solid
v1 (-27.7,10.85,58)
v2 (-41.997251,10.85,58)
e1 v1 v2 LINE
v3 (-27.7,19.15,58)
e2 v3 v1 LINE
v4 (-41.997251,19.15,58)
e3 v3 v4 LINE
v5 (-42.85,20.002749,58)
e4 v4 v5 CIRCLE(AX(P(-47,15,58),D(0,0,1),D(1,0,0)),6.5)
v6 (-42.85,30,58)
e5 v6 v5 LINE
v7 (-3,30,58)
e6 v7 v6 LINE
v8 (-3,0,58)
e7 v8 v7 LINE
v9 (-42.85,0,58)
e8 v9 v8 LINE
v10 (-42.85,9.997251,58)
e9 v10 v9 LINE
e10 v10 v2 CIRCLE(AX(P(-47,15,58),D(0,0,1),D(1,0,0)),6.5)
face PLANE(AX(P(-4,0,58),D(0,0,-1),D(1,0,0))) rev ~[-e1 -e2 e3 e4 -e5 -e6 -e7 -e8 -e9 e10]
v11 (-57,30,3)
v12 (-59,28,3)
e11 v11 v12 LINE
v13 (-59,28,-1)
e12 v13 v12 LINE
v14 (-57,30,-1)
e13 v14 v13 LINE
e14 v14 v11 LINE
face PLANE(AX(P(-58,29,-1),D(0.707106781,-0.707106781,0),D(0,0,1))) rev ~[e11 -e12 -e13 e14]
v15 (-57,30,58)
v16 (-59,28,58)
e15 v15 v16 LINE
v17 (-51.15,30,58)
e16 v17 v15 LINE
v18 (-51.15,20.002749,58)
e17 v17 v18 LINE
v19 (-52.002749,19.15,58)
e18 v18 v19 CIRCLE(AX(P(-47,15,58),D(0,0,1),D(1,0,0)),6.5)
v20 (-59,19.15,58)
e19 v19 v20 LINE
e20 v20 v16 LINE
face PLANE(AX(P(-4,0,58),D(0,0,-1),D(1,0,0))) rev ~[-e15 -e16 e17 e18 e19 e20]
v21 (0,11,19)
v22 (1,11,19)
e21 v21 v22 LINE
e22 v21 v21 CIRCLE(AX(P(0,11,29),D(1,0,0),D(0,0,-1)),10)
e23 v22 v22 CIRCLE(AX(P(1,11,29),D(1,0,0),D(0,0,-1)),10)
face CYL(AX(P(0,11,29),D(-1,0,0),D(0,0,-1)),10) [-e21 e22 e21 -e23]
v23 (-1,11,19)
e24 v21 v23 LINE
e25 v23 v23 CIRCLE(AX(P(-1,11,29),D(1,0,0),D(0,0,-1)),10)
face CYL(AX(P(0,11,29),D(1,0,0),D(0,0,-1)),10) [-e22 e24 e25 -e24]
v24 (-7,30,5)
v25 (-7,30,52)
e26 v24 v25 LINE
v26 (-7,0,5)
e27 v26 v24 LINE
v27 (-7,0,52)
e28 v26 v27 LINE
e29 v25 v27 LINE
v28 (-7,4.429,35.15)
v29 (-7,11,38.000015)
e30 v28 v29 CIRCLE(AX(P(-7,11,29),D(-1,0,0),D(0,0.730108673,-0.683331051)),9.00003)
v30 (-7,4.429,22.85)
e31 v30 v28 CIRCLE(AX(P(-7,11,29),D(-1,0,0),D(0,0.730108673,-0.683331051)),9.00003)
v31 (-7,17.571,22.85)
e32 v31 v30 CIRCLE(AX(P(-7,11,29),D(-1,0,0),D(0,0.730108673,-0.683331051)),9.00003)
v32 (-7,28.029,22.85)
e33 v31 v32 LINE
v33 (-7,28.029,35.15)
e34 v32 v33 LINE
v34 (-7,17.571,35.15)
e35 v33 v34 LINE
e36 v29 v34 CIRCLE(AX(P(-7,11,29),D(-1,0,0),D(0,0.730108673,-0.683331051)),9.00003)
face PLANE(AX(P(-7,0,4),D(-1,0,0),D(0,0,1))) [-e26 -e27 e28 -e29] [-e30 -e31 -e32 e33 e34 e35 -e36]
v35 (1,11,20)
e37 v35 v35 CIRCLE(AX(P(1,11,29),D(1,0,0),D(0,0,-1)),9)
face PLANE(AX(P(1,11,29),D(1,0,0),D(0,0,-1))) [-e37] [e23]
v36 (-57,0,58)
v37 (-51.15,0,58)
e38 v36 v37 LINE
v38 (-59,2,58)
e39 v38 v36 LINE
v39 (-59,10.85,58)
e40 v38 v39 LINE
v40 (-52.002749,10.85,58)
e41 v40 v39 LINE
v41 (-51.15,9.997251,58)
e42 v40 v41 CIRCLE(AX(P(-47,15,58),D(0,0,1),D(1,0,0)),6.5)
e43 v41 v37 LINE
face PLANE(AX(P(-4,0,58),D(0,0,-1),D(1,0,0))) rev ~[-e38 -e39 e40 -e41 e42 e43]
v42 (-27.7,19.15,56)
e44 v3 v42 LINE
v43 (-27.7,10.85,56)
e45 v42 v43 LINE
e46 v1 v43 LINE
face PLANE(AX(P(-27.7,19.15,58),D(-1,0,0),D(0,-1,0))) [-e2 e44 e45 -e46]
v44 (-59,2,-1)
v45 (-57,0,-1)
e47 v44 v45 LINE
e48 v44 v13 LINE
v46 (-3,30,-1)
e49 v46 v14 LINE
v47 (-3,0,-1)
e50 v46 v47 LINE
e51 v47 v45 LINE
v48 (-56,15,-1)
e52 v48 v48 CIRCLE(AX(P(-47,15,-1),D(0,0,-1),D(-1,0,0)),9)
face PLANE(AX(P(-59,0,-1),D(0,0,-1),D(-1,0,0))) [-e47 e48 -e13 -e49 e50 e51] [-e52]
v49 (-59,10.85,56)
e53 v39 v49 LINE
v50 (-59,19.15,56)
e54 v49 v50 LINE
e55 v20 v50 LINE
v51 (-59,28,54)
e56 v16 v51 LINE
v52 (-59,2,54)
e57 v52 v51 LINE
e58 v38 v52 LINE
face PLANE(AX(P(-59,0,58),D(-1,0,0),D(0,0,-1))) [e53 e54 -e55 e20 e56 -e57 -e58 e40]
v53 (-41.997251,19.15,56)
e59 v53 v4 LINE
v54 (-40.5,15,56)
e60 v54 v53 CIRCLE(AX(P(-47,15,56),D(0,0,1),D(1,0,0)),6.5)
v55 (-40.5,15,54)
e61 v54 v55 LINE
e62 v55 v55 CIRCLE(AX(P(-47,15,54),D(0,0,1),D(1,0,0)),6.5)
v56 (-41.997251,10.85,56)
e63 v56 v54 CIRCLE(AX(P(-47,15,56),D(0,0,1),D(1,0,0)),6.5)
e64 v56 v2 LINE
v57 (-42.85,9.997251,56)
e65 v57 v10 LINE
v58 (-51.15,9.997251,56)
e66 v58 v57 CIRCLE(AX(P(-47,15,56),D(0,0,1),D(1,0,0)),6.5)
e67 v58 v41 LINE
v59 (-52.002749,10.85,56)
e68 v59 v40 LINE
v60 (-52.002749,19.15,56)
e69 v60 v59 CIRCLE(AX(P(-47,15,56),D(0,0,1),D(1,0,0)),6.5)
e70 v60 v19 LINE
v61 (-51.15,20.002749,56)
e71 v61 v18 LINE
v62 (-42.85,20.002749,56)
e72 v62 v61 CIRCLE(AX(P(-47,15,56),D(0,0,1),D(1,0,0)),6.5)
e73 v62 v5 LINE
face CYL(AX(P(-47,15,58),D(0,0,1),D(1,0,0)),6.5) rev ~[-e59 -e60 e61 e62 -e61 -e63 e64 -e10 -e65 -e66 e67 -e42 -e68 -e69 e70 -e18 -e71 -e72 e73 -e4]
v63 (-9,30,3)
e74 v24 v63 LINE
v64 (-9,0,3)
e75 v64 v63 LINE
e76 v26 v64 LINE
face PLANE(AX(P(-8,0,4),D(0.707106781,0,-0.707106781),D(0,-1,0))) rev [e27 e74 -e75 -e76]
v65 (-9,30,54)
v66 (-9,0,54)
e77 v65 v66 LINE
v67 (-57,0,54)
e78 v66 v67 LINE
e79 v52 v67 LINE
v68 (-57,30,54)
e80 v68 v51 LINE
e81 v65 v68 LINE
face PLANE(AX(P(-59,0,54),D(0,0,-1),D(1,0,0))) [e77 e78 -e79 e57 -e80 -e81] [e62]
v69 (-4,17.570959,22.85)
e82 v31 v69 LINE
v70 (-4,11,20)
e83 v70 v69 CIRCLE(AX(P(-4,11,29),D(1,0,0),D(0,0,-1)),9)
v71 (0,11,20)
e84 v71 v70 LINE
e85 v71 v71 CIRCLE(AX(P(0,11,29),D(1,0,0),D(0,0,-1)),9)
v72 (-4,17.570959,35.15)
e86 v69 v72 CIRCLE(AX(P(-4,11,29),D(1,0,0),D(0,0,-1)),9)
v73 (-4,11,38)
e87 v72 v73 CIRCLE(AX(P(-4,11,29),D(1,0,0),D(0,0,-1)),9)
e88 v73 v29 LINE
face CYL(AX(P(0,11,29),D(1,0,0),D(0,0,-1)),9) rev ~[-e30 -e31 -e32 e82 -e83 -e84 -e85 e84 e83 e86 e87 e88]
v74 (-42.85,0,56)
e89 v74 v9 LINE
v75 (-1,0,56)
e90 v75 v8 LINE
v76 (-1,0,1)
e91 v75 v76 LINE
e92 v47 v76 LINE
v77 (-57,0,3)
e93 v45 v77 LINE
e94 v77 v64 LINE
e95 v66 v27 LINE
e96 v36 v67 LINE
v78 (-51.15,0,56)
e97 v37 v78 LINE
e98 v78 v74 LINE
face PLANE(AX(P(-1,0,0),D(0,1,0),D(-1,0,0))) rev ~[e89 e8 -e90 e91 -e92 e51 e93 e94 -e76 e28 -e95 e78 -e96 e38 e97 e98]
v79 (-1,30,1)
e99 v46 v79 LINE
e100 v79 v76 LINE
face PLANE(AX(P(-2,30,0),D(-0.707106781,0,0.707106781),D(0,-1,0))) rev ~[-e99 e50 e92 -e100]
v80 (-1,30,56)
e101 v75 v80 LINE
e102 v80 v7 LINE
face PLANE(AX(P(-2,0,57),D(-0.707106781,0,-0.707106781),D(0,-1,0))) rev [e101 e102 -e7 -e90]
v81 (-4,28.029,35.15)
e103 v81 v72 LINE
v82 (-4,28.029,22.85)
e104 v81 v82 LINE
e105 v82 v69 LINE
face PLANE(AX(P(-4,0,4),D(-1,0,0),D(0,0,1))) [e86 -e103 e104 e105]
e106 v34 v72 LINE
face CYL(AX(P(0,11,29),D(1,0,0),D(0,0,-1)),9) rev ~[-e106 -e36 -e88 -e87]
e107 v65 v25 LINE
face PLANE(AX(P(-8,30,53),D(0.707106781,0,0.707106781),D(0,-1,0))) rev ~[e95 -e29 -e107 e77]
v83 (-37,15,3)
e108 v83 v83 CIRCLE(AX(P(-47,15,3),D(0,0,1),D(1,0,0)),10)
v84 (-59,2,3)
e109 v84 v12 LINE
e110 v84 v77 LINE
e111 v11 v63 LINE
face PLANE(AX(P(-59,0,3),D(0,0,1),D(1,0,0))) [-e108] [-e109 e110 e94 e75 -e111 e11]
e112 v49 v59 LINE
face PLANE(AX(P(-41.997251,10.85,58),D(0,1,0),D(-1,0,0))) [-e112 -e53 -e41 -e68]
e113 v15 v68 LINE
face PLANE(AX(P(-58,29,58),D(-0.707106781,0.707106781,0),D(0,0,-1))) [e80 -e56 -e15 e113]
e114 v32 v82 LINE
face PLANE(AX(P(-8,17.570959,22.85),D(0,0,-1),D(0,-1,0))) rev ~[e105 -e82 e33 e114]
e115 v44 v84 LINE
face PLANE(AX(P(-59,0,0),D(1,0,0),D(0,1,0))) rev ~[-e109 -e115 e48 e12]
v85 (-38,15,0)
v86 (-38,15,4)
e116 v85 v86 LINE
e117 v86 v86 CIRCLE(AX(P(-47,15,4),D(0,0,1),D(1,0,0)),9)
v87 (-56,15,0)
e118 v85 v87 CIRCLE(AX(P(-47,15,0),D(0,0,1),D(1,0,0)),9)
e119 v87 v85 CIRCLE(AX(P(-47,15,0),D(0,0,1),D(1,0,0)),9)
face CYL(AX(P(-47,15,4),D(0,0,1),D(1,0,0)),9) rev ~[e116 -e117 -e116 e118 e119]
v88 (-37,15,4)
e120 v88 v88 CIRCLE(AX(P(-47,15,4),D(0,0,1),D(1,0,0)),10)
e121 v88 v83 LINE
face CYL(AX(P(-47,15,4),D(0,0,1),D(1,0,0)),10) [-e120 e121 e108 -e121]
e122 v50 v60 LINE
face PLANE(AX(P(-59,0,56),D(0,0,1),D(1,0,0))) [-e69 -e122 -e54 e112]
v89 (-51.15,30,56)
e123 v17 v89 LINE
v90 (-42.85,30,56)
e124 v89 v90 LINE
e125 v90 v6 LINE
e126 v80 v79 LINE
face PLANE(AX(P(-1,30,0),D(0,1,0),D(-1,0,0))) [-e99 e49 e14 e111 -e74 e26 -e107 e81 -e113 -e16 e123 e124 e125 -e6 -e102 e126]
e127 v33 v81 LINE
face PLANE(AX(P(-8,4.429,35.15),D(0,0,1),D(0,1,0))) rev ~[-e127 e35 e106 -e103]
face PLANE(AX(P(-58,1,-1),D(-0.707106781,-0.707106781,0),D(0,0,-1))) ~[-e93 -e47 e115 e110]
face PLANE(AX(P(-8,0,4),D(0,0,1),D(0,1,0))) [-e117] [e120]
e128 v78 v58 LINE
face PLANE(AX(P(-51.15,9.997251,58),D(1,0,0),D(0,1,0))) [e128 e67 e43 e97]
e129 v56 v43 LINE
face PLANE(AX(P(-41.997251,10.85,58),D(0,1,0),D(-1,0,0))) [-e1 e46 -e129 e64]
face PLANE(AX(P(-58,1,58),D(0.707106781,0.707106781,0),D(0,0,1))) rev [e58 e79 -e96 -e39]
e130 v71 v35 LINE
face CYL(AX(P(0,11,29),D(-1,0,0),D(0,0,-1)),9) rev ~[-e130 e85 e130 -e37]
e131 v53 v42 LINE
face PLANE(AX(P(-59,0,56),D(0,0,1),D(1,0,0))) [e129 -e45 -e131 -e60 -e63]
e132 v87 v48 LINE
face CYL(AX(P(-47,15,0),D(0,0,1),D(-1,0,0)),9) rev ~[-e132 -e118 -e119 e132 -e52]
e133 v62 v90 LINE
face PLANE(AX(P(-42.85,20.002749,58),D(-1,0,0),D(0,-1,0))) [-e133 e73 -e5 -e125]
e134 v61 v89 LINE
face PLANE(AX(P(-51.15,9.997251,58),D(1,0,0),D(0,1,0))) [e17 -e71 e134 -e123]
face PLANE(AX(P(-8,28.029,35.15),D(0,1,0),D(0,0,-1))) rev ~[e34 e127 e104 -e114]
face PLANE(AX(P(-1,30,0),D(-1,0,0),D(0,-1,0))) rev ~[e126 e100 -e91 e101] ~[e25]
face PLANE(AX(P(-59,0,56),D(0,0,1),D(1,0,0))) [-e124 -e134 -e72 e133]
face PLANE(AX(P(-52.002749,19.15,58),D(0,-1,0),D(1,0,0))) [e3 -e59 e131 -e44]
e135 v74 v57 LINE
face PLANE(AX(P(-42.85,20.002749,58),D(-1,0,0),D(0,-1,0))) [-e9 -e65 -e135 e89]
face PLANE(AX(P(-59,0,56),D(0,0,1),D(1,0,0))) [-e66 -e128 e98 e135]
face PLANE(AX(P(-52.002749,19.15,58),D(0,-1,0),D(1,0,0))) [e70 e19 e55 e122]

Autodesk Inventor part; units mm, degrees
ref_plane "YZ Plane" through (0, 0, 0) normal (1, 0, 0) x (0, 1, 0)
ref_plane "XZ Plane" through (0, 0, 0) normal (0, 1, 0) x (-1, 0, 0)
ref_plane "XY Plane" through (0, 0, 0) normal (0, 0, 1) x (1, 0, 0)
sketch "Boceto1" plane through (0, 0, 0) normal (0, 1, 0) x (-1, 0, 0)
  line L0 (0, 0) -> (4, 0)
  line L1 (4, 0) -> (4, 58)
  line L2 (4, 58) -> (0, 58)
  line L3 (0, 58) -> (0, 0)
  line L4 (4, 58) -> (59, 58)
  line L5 (59, 58) -> (59, 54)
  line L6 (59, 54) -> (4, 54)
  line L7 (4, 54) -> (4, 58)
  line L8 (4, 0) -> (59, 0)
  line L9 (59, 0) -> (59, 4)
  line L10 (59, 4) -> (4, 4)
  line L11 (4, 4) -> (4, 0)
  dimension "d4" = 58
  dimension "d5" = 55
  dimension "d6" = 4
  dimension "d7" = 55
  dimension "d8" = 4
  dimension "d54" = 4
extrude "Extrusión1" add sketch "Boceto1" along normal blind 30
sketch "Boceto3" plane through (-59, 0, 4) normal (0, 0, 1) x (1, 0, 0)
  line L0 (0, 0) -> (0, 30) projected
  circle A0 centre (12, 15) radius 9
  point P0 (59, 0)
  point P1 (0, 15)
  dimension "d19" = 18
  dimension "d20" = 12
extrude "Extrusión2" cut sketch "Boceto3" against normal blind 8 and the other way blind 2
sketch "Boceto5" plane through (0, 0, 58) normal (1, 0, 0) x (0, 0, -1)
  circle A0 centre (29, 11) radius 9
  line L0 (0, 30) -> (58, 30) projected
  line L1 (0, 0) -> (58, 0) projected
  line L2 (58, 0) -> (58, 30) projected
  line L3 (0, 0) -> (0, 30) projected
  point P0 (29, 30)
  point P1 (29, 30)
  dimension "d28" = 18
  dimension "d73" = 11
extrude "Extrusión4" cut sketch "Boceto5" against normal blind 20 contours A0
sketch "Boceto6" plane through (-4, 0, 4) normal (-1, 0, 0) x (0, 0, 1)
  circle A0 centre (25, 11) radius 9 projected
  line L0 (0, 30) -> (0, 0) projected
  line L1 (0, 0) -> (50, 0) projected
  line L2 (50, 0) -> (50, 30) projected
  line L3 (0, 30) -> (50, 30) projected
  point P0 (-4, 0)
extrude "Extrusión5" add sketch "Boceto6" along normal blind 4
sketch "Boceto8" plane through (-59, 0, 58) normal (0, 0, 1) x (1, 0, 0)
  circle A0 centre (12, 15) radius 6.5
  line L0 (0, 0) -> (0, 30) projected
  line L1 (0, 9) -> (0, 16)
  point P0 (0, 15)
  dimension "d40" = 13
  dimension "d42" = 12
extrude "Extrusión7" cut sketch "Boceto8" against normal blind 5
sketch "Boceto9" plane through (-59, 0, 58) normal (0, 0, 1) x (1, 0, 0)
  circle A0 centre (12, 15) radius 6.5 projected
  line L0 (0, 19.15) -> (31.3, 19.15)
  line L1 (31.3, 19.15) -> (31.3, 10.85)
  line L2 (31.3, 10.85) -> (0, 10.85)
  line L3 (0, 10.85) -> (0, 19.15)
  line L4 (0, 0) -> (0, 30) projected
  point P0 (0, 15)
  dimension "d44" = 19.3
  dimension "d45" = 8.3
sketch "Boceto10" plane through (-59, 0, 58) normal (0, 0, 1) x (1, 0, 0)
  circle A0 centre (12, 15) radius 6.5 projected
  line L0 (0, 0) -> (0, 30) projected
  line L1 (7.85, 33.3) -> (16.15, 33.3)
  line L2 (16.15, 33.3) -> (16.15, -3.3)
  line L3 (16.15, -3.3) -> (7.85, -3.3)
  line L4 (7.85, -3.3) -> (7.85, 33.3)
  point P0 (7.85, 15)
  point P1 (0, 15)
  point P2 (12, 33.3)
  dimension "d48" = 8.3
  dimension "d49" = 36.6
extrude "Extrusión8" cut sketch "Boceto10" against normal blind 2 contours L2 A0 L4 | A0 L4 L1 L2 | L2 L3 L4 A0
extrude "Extrusión9" cut sketch "Boceto9" against normal blind 2 contours A0 L2 L0 | A0 L0 L1 L2 | A0 L2 L3 L0
sketch "Boceto12" plane through (-8, 0, 4) normal (-1, 0, 0) x (0, 0, 1)
  circle A0 centre (25, 11) radius 9 projected
  line L0 (18.85, 4.429) -> (31.15, 4.429)
  line L1 (31.15, 4.429) -> (31.15, 28.029)
  line L2 (31.15, 28.029) -> (18.85, 28.029)
  line L3 (18.85, 28.029) -> (18.85, 4.429)
  point P0 (-4, 0)
  point P1 (25, 4.429)
  dimension "d76" = 12.3
  dimension "d77" = 23.6
extrude "Extrusión11" cut sketch "Boceto12" against normal blind 4 contours L3 A0 L1 L0 | L3 L2 L1 A0
sketch "Boceto13" plane through (0, 0, 58) normal (1, 0, 0) x (0, 0, -1)
  circle A0 centre (29, 11) radius 9 projected
  line L0 (0, 0) -> (58, 0) projected
  line L1 (58, 0) -> (58, 30) projected
  line L2 (0, 30) -> (58, 30) projected
  line L3 (0, 0) -> (0, 30) projected
  circle A1 centre (29, 11) radius 10
extrude "Extrusión12" cut sketch "Boceto13" against normal blind 1 contours L3 L2 L1 L0
chamfer "Chaflán5" distance 2 angle 45 1 edges at (-1, 15, 58)
sketch "Boceto14" plane through (-8, 0, 4) normal (-1, 0, 0) x (0, 0, 1)
  line L0 (0, 0) -> (0, 30) projected
  line L1 (0, 0) -> (50, 0) projected
  line L2 (50, 30) -> (50, 0) projected
  line L3 (50, 30) -> (0, 30) projected
  line L4 (18.85, 17.571) -> (18.85, 28.029) projected
  line L5 (18.85, 28.029) -> (31.15, 28.029) projected
  line L6 (31.15, 28.029) -> (31.15, 17.571) projected
  arc A0 (18.85, 17.571) -> (31.15, 17.571) centre (25, 11) ccw projected
  point P0 (-4, 0)
extrude "Extrusión13" cut sketch "Boceto14" against normal blind 1
sketch "Boceto16" plane through (-59, 0, 0) normal (0, 0, -1) x (-1, 0, 0)
  line L0 (-58, 30) -> (-58, 0) projected
  line L1 (-58, 0) -> (0, 0) projected
  line L2 (0, 0) -> (0, 30) projected
  line L3 (-58, 30) -> (0, 30) projected
  circle A0 centre (-12, 15) radius 9 projected
  point P0 (-59, 0)
extrude "Extrusión14" add sketch "Boceto16" along normal blind 1
sketch "Boceto18" plane through (-59, 0, 4) normal (0, 0, 1) x (1, 0, 0)
  line L0 (0, 30) -> (52, 30) projected
  line L1 (0, 0) -> (0, 30) projected
  line L2 (0, 0) -> (52, 0) projected
  line L3 (52, 0) -> (52, 30) projected
  circle A0 centre (12, 15) radius 9 projected
  circle A1 centre (12, 15) radius 10
  point P0 (59, 0)
extrude "Extrusión16" cut sketch "Boceto18" against normal blind 1 contours L0 L3 L2 L1
chamfer "Chaflán8" distance 2 angle 45 2 edges at (-7, 15, 3) (-7, 15, 54)
chamfer "Chaflán9" distance 2 angle 45 1 edges at (-1, 15, -1)
chamfer "Chaflán10" distance 2 angle 45 4 edges at (-59, 30, 1) (-59, 0, 1) (-59, 0, 56) (-59, 30, 56)
sketch "Boceto19" plane through (0, 11, 29) normal (1, 0, 0) x (0, 0, -1)
  circle A0 centre (0, 0) radius 10 projected
  circle A1 centre (0, 0) radius 9 projected
  point P0 (29, -11)
extrude "Extrusión17" add sketch "Boceto19" along normal blind 1
properties part number "Enlace1"
